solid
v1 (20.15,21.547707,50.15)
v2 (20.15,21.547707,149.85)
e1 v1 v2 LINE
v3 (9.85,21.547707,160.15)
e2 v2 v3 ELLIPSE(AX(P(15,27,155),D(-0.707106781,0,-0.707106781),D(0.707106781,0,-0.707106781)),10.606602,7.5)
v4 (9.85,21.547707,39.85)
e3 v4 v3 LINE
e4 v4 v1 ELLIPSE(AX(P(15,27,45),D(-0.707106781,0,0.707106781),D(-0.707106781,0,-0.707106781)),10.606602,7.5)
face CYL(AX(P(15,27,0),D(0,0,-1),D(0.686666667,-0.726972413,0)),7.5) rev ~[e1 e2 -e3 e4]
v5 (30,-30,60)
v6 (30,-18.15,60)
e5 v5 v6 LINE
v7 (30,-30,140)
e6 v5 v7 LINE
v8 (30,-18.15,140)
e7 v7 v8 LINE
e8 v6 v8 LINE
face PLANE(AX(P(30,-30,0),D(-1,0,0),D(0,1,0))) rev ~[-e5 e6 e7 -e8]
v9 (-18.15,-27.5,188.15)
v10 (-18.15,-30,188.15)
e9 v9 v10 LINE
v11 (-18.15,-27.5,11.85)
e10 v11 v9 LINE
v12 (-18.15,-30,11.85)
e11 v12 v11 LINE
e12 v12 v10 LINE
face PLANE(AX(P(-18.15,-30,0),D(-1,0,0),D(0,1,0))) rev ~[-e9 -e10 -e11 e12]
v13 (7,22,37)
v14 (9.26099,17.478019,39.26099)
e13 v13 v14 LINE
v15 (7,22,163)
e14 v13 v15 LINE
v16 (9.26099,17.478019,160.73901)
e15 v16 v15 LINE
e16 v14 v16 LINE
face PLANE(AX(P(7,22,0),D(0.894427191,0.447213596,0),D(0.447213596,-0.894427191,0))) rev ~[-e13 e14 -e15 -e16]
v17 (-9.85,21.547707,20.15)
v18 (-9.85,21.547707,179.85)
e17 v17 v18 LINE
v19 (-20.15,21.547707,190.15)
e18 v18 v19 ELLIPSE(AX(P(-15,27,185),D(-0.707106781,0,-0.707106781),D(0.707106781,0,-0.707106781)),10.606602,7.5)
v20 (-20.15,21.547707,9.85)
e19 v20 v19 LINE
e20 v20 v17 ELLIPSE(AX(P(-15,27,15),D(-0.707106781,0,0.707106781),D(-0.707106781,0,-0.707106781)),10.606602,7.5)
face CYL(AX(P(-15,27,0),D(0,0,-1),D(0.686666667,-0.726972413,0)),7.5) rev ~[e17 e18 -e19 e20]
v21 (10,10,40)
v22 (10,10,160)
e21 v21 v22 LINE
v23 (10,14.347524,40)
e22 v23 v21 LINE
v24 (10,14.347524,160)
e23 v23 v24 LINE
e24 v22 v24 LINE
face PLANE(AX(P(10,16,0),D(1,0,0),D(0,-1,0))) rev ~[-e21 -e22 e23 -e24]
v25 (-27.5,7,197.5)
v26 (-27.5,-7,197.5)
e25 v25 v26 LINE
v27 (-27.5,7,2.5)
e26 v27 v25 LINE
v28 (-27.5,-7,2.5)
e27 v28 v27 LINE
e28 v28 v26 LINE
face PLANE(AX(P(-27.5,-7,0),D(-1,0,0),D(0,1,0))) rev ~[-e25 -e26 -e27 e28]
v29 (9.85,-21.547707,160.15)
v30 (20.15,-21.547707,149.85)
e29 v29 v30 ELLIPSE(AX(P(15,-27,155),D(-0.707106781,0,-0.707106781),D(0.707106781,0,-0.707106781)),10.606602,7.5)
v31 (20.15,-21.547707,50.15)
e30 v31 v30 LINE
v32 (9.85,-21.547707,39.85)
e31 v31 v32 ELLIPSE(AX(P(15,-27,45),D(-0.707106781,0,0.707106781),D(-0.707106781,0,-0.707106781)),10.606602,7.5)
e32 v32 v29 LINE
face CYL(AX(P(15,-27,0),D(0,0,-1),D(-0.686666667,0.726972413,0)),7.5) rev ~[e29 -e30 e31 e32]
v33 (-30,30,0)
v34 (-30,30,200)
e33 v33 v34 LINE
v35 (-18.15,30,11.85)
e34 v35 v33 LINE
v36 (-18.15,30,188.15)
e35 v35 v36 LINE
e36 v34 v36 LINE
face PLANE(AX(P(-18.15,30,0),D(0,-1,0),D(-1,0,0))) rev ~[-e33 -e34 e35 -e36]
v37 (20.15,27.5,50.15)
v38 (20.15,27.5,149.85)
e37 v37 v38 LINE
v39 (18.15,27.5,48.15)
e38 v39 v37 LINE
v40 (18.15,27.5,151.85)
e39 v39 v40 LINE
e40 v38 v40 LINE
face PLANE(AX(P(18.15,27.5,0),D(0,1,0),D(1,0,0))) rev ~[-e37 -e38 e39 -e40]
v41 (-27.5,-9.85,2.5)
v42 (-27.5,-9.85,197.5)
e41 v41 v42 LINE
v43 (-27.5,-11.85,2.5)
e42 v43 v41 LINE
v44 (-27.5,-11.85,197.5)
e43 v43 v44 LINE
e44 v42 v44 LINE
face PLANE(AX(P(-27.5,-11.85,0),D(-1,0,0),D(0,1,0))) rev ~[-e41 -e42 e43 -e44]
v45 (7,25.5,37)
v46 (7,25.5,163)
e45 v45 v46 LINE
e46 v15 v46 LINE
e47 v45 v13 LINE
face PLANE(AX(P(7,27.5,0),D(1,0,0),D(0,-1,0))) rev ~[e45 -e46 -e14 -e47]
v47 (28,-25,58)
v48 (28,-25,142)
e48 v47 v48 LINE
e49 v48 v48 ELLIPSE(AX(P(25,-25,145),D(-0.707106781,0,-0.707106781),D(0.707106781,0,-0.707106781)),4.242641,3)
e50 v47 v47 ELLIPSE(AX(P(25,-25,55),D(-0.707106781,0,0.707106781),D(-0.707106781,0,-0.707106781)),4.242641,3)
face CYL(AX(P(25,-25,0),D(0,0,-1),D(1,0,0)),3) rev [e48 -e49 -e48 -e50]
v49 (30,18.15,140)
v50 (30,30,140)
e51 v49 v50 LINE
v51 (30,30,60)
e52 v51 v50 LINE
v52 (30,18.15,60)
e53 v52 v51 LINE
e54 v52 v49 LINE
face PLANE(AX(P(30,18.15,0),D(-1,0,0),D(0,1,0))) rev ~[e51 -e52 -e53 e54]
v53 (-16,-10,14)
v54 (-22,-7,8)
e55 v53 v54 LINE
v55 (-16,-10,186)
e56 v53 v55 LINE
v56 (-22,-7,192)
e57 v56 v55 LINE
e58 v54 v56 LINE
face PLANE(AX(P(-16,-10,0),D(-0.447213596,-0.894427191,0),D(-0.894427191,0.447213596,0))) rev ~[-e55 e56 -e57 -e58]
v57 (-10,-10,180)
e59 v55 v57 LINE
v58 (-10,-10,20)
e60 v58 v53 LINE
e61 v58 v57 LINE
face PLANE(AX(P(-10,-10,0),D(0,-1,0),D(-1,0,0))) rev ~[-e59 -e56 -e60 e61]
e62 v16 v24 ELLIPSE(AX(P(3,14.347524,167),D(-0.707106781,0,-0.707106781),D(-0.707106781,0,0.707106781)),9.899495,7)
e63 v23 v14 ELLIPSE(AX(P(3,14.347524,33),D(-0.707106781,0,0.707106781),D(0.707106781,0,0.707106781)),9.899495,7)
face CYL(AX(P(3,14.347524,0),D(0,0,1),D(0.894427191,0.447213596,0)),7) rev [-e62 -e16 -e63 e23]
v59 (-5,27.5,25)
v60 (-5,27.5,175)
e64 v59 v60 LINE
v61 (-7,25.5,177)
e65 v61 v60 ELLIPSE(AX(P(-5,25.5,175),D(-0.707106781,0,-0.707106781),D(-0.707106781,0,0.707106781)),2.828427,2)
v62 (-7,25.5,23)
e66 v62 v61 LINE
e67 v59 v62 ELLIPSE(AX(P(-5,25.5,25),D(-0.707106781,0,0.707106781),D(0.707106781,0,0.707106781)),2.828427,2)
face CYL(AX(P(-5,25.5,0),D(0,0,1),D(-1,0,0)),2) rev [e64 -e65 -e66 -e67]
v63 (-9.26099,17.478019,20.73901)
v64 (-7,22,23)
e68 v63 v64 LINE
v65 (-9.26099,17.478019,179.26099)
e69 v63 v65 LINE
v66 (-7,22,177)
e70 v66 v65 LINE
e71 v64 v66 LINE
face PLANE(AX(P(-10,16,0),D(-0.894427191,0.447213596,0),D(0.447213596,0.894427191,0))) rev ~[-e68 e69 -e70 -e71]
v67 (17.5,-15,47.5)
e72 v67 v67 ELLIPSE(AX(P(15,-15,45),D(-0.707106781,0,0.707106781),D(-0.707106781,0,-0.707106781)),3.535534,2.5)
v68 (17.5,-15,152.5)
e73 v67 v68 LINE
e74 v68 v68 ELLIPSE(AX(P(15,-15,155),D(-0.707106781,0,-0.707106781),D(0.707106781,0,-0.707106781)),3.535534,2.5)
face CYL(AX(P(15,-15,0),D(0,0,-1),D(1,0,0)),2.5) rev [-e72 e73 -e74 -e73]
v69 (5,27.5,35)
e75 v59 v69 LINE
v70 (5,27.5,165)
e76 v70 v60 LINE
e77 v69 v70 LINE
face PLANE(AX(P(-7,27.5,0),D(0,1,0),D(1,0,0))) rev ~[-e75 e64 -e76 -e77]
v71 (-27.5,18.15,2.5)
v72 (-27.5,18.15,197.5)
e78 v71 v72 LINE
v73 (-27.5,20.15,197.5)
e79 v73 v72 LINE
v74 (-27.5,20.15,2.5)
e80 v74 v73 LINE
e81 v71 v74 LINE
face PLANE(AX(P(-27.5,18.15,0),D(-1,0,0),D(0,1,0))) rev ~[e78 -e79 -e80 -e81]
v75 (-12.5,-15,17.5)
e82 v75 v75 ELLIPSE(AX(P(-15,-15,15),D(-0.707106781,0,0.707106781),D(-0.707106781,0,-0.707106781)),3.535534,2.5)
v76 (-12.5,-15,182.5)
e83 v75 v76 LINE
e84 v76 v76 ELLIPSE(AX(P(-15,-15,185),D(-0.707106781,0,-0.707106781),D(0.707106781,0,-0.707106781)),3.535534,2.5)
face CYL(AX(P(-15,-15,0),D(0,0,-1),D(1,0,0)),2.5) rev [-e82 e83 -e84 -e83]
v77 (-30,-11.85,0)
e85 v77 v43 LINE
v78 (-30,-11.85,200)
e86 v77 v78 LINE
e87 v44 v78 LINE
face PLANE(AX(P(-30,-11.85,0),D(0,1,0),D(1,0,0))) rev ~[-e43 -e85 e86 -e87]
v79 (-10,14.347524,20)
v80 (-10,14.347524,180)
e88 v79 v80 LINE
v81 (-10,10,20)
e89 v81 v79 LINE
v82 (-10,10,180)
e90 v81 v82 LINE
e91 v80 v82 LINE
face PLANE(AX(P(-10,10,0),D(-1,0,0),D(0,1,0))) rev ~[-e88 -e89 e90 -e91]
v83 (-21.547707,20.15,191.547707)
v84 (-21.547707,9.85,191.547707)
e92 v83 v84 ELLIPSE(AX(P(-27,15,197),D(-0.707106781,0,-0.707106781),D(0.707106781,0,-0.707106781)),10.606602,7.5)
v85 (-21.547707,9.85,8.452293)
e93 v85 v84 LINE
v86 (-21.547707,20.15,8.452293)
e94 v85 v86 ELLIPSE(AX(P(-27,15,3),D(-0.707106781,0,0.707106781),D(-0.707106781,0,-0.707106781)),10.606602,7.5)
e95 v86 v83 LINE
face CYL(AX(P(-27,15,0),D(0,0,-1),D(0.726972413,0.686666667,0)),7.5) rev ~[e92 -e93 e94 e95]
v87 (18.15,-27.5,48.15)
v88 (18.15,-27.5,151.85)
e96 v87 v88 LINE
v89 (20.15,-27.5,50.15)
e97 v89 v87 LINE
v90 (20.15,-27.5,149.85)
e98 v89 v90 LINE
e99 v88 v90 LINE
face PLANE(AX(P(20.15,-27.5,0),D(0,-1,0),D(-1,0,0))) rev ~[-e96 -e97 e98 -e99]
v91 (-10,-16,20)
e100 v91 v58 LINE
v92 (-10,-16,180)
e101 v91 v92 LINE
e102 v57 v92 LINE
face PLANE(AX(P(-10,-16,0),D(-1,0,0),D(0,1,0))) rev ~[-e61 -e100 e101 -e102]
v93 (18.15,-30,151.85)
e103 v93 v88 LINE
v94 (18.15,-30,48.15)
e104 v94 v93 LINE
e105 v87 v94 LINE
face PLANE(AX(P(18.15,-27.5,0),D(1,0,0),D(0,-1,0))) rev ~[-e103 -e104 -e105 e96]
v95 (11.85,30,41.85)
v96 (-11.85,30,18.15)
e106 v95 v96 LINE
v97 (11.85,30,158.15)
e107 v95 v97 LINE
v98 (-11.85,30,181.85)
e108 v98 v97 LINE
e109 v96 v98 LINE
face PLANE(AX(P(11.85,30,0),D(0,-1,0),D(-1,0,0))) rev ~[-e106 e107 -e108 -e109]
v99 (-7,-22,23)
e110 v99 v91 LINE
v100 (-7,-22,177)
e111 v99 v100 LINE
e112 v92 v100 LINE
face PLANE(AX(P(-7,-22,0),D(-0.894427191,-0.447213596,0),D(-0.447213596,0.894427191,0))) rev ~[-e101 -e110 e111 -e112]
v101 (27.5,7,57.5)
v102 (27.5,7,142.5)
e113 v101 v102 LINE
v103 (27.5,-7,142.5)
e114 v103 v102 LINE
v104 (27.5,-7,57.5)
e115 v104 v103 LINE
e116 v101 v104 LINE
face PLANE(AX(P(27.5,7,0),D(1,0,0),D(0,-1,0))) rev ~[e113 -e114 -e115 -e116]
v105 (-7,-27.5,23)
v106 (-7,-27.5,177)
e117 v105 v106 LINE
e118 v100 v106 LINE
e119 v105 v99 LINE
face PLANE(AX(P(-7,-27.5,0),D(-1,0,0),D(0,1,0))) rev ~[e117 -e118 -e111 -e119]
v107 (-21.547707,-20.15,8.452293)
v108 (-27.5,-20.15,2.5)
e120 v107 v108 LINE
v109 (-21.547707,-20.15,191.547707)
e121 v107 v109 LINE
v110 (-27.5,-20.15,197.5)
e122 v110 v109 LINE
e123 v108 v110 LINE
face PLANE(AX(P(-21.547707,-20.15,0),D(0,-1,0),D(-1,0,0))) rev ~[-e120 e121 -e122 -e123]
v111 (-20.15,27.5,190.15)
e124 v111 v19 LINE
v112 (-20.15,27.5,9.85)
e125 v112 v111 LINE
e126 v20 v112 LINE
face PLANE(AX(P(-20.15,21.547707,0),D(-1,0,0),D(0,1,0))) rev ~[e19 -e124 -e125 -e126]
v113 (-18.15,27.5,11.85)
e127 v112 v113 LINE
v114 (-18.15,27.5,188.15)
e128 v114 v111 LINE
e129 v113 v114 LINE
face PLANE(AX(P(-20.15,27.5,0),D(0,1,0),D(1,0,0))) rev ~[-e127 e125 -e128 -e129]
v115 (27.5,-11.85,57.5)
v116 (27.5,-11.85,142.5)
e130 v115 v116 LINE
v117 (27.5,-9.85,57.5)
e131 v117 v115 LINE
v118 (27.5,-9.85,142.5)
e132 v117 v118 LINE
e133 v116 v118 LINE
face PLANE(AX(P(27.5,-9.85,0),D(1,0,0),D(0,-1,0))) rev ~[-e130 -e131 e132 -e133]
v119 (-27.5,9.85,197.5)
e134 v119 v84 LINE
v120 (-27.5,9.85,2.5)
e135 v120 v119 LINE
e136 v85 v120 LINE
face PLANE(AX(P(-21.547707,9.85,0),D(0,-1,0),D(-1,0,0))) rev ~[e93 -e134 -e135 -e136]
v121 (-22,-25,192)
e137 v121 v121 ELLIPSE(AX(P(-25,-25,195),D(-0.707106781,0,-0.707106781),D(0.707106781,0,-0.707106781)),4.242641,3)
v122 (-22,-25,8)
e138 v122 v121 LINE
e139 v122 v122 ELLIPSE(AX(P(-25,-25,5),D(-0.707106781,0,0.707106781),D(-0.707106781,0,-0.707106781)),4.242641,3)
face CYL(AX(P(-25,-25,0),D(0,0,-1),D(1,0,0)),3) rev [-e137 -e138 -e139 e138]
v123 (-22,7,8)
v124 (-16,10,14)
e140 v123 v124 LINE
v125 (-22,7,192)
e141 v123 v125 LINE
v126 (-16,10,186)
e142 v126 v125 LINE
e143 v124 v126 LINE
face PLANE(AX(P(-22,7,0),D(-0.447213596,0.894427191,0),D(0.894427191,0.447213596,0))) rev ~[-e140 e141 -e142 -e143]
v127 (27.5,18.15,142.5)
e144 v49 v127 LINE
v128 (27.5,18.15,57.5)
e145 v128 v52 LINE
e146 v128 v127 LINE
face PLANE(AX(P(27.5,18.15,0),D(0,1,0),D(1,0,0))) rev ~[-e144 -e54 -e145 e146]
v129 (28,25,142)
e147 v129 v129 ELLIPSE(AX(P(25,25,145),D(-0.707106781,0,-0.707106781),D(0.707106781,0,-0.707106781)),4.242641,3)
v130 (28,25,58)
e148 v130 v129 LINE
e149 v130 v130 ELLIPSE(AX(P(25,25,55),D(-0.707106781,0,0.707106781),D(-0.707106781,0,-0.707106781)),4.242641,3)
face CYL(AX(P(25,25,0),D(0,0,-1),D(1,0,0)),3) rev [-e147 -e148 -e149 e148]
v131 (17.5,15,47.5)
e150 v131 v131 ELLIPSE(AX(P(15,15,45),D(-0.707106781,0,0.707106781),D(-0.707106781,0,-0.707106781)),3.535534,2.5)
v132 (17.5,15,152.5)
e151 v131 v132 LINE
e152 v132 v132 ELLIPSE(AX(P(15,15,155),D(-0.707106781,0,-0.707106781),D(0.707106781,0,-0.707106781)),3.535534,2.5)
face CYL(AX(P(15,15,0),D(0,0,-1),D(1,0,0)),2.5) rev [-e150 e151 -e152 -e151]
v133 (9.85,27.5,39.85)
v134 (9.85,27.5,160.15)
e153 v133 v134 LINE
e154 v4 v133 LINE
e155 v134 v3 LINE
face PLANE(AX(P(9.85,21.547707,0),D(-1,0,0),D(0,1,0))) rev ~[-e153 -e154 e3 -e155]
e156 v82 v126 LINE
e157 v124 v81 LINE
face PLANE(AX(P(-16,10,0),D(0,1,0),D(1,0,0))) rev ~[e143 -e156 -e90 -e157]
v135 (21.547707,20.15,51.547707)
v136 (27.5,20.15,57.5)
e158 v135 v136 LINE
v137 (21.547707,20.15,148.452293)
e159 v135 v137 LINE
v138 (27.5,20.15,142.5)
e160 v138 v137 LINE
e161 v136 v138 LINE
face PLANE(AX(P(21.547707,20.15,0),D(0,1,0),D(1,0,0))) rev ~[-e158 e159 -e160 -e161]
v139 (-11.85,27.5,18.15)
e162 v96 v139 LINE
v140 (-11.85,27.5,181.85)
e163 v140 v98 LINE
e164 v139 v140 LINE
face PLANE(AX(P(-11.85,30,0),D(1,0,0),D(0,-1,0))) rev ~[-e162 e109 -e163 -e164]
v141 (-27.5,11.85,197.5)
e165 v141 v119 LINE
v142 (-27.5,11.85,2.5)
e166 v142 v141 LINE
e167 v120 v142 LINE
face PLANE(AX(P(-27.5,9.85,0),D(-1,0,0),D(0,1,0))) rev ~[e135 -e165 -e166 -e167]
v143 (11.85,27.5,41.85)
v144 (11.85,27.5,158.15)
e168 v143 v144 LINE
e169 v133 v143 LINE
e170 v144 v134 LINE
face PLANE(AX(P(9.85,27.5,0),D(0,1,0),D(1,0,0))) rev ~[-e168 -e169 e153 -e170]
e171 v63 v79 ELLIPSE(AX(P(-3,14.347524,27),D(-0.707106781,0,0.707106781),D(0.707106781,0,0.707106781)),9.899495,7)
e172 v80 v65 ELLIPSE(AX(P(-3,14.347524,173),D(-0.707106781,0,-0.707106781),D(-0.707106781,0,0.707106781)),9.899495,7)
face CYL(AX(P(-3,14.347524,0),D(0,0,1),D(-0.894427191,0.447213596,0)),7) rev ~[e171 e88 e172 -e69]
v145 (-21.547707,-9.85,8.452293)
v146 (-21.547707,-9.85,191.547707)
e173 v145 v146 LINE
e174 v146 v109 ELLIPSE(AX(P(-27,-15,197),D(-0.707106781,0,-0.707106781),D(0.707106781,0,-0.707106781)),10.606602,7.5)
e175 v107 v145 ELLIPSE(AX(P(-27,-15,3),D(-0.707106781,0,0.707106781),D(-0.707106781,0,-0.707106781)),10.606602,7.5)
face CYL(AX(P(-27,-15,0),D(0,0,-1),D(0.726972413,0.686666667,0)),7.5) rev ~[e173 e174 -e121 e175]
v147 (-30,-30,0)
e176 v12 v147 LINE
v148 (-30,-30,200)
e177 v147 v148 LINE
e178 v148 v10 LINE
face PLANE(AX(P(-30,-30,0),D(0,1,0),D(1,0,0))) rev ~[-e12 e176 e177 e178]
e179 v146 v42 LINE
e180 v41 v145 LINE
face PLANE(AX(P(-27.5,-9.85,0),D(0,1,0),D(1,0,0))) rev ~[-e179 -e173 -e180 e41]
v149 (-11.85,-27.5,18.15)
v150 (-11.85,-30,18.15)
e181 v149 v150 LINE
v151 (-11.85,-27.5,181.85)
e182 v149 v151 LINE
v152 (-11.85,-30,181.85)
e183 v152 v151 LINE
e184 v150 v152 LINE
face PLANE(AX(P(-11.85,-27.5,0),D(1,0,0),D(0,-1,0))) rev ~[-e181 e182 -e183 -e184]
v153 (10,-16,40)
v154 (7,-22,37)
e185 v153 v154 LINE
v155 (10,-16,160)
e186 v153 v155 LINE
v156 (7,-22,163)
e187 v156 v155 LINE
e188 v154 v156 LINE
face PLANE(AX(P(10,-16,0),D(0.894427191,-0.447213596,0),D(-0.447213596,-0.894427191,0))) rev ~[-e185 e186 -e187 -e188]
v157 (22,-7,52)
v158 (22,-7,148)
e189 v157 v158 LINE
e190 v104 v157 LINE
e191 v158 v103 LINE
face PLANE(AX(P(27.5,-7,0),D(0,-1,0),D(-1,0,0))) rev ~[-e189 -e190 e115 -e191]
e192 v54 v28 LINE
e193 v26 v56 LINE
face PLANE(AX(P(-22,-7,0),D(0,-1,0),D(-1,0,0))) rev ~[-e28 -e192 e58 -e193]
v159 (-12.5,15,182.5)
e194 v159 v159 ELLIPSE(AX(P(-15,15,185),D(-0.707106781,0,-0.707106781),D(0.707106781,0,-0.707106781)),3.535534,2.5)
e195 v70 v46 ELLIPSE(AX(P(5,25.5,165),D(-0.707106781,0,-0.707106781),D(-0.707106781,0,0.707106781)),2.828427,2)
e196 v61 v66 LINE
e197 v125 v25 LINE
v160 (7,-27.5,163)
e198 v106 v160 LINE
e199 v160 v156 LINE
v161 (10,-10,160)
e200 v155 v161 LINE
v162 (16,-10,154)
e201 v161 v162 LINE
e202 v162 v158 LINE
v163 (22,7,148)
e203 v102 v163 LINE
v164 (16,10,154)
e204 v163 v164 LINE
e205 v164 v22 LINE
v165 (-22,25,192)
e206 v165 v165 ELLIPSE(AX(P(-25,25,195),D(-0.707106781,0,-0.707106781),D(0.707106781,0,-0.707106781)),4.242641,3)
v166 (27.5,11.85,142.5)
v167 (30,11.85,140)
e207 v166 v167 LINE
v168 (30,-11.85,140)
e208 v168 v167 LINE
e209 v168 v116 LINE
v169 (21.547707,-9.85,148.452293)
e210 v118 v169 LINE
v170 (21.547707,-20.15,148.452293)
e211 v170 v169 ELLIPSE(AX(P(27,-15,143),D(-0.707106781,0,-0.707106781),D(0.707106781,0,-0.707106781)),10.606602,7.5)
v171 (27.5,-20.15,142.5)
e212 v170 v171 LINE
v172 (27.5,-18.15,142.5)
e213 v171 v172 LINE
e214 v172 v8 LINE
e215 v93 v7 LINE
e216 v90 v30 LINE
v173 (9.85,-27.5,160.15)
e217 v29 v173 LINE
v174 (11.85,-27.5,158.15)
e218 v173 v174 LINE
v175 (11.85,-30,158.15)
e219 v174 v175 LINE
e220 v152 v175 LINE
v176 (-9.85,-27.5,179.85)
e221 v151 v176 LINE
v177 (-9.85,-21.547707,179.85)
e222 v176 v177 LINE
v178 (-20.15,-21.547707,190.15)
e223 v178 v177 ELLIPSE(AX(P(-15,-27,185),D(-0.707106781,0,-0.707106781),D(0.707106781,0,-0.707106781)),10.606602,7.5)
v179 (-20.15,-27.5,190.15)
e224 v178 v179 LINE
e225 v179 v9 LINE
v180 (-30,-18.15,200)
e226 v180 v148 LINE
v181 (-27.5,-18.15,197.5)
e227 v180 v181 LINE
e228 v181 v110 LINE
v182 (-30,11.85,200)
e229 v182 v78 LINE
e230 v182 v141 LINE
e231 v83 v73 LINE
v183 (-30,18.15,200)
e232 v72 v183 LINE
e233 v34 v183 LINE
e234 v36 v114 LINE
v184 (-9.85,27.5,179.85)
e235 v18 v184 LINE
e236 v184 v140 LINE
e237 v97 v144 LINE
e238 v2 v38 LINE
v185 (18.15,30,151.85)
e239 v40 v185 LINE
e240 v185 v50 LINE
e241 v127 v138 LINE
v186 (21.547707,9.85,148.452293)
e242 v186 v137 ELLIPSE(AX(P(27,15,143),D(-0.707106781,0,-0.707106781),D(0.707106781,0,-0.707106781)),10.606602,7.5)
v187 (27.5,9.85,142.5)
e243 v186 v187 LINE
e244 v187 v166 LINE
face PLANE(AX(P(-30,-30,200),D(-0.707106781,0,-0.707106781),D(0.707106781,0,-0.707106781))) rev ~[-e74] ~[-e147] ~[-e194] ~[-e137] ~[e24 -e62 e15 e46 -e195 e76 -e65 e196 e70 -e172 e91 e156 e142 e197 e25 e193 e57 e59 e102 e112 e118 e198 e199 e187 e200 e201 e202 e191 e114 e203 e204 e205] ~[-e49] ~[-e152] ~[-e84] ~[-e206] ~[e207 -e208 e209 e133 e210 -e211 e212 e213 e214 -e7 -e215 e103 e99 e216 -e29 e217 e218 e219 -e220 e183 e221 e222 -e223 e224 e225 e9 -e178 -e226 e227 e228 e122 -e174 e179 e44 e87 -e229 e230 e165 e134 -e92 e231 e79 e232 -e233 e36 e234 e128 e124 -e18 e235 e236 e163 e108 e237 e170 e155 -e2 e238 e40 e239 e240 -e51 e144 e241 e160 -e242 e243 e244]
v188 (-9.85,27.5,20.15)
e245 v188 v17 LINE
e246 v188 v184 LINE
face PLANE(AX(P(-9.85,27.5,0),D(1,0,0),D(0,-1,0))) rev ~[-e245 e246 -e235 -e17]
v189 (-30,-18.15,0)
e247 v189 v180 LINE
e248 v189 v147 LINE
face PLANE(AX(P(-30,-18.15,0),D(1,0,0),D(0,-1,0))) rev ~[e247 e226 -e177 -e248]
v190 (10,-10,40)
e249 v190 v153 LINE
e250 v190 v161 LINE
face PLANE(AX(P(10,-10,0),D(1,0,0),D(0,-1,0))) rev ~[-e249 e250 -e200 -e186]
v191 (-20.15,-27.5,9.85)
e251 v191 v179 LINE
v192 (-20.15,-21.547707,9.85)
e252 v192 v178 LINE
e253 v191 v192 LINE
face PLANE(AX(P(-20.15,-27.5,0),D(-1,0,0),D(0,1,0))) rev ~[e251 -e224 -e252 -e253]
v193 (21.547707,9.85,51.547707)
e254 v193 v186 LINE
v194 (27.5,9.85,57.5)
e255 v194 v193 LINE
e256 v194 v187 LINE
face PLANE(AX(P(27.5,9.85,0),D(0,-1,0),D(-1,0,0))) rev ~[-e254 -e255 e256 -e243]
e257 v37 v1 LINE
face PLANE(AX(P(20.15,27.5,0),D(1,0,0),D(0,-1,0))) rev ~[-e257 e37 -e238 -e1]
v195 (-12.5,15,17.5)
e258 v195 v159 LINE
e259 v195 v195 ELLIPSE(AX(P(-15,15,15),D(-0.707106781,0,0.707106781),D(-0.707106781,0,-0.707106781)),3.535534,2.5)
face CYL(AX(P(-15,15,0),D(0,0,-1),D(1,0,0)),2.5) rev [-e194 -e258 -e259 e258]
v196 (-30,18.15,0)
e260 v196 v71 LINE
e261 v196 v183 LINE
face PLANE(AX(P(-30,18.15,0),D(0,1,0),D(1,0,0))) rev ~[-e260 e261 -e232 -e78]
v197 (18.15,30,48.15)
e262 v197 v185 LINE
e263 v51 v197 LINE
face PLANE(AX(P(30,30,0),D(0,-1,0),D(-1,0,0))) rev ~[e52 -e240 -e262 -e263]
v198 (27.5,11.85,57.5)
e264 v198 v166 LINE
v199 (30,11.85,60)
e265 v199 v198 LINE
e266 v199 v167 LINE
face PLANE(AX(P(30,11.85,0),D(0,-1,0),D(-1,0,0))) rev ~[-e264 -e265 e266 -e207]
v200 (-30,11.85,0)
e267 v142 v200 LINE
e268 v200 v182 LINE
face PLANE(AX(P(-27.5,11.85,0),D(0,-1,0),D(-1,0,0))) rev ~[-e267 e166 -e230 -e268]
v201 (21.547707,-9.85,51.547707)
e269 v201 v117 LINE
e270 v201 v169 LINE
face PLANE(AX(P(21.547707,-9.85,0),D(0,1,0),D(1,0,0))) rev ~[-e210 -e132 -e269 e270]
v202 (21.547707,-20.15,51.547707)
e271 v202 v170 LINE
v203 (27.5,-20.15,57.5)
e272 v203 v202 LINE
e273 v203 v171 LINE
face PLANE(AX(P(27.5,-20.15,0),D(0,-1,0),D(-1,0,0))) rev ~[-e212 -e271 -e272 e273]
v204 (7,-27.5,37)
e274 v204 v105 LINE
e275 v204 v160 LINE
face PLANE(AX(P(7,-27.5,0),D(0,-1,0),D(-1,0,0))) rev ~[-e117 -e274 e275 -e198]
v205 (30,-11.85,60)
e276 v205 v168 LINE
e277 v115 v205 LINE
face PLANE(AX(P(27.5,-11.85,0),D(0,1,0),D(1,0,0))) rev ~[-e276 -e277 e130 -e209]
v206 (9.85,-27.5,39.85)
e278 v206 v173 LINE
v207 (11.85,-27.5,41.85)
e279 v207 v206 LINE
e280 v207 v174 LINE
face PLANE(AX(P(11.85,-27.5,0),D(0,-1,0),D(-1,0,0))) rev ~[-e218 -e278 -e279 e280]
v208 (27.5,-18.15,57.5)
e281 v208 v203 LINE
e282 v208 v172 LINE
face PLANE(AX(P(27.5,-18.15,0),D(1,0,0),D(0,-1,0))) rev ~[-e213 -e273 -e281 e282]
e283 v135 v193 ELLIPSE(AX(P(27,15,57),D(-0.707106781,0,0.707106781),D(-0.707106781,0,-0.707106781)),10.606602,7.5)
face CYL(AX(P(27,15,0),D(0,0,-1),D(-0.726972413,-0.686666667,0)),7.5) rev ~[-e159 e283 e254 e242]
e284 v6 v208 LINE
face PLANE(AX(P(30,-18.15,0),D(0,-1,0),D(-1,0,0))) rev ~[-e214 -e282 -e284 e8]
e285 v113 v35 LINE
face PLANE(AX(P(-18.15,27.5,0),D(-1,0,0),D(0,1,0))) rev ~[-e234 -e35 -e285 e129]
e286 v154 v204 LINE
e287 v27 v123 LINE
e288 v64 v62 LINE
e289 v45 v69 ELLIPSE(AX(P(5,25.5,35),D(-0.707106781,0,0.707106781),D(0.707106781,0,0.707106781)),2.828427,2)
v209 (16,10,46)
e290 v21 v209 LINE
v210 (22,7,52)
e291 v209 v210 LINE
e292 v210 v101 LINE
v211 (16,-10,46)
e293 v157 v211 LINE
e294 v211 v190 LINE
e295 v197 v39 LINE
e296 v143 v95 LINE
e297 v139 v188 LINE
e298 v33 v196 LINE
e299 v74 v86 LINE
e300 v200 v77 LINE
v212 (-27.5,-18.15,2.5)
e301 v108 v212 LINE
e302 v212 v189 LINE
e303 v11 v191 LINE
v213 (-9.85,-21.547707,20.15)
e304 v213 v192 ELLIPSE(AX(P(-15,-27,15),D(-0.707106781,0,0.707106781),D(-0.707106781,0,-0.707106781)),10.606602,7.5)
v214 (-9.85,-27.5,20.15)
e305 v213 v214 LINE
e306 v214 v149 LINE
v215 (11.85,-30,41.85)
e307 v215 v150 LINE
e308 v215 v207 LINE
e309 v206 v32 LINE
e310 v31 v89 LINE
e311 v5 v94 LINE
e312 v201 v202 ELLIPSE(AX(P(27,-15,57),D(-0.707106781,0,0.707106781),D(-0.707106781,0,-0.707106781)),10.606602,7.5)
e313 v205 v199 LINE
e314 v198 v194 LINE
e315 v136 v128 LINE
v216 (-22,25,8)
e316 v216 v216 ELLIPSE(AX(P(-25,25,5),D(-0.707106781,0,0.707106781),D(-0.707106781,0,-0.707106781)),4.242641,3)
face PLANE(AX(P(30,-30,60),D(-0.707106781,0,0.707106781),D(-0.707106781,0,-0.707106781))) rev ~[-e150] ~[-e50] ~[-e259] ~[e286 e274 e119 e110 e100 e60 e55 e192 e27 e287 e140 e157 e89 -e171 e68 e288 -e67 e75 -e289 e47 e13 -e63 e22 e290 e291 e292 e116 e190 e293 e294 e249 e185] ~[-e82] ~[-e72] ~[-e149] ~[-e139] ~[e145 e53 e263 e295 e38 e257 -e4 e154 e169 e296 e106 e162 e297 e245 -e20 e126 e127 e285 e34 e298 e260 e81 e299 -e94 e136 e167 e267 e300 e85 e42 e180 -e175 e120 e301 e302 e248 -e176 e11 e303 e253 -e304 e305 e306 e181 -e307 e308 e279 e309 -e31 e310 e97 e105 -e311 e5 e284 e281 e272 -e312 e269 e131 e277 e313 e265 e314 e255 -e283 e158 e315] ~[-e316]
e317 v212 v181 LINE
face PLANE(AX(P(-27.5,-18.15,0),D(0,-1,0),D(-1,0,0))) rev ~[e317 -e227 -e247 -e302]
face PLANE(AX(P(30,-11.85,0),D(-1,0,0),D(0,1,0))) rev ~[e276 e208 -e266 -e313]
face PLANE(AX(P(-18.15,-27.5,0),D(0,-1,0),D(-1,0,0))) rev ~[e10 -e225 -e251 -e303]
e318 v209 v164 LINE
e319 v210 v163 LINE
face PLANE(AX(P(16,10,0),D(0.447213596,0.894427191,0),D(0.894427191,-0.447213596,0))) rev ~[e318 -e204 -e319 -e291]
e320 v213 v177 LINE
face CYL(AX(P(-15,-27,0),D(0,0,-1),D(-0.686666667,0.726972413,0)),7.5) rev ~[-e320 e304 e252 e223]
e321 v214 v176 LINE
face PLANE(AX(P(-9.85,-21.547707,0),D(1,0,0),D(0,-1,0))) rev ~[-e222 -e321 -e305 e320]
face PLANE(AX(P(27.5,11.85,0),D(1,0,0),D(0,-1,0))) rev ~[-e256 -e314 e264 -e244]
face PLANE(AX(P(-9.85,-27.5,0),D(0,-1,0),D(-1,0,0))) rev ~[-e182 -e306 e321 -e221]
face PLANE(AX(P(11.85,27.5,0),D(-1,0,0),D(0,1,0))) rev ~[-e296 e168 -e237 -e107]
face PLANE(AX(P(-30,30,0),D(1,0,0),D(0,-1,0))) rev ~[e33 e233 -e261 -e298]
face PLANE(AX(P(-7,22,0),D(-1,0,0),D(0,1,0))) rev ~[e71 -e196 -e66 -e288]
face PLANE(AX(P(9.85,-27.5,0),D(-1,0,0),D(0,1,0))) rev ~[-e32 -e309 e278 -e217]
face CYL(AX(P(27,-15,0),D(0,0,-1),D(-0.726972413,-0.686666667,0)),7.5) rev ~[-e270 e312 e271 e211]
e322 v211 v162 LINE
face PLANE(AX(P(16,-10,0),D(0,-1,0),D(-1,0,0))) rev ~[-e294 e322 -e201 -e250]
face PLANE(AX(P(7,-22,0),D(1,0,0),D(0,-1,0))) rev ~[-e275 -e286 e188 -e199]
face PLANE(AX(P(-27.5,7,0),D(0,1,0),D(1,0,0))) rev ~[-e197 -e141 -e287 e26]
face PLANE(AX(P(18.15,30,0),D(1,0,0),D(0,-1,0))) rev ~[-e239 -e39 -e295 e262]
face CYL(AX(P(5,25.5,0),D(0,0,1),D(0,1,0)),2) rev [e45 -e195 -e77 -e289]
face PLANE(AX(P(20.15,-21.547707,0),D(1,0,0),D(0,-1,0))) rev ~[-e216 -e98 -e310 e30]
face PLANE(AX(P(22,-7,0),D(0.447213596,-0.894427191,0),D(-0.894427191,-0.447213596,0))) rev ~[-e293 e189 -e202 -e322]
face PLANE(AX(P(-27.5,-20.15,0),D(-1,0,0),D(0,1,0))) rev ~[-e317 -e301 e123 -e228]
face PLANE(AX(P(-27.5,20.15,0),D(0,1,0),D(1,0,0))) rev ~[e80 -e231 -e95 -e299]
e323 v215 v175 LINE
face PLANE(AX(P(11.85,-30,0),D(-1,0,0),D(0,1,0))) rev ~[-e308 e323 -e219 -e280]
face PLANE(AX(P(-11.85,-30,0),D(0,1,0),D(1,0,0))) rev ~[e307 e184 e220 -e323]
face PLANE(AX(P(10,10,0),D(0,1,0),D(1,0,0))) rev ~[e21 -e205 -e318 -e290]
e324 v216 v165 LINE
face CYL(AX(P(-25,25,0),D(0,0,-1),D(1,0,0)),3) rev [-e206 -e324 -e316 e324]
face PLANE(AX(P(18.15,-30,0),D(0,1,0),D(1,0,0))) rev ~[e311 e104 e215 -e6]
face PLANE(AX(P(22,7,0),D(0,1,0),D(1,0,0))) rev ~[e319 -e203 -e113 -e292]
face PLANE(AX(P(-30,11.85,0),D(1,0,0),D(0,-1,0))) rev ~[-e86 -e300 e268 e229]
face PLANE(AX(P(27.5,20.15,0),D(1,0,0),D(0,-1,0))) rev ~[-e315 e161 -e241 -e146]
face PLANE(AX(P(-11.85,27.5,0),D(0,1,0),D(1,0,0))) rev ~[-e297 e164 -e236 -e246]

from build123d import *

# Parameters (mm, degrees)
F0_R     = 3
F0_R_2   = 2.5
F1_DEPTH = 200
F2_R     = 2
F3_R     = 7
F5_DEPTH = 60


# Not quite as in the source:
# - a feature names something its author has since deleted; it is built from what else it names


with BuildPart() as f1:
    # F0 (on Top) → F1 (new body)
    with BuildSketch(Plane.XY):
        with BuildLine():
            Line((18.15, -30), (30, -30))
            Line((30, -30), (30, -18.15))
            Line((30, -18.15), (27.5, -18.15))
            Line((27.5, -18.15), (27.5, -20.15))
            Line((27.5, -20.15), (21.5477069044, -20.15))
            ThreePointArc((21.5477069044, -20.15), (19.5, -15), (21.5477069044, -9.85))
            Line((21.5477069044, -9.85), (27.5, -9.85))
            Line((27.5, -9.85), (27.5, -11.85))
            Line((27.5, -11.85), (30, -11.85))
            Line((30, -11.85), (30, 11.85))
            Line((30, 11.85), (27.5, 11.85))
            Line((27.5, 11.85), (27.5, 9.85))
            Line((27.5, 9.85), (21.5477069044, 9.85))
            ThreePointArc((21.5477069044, 9.85), (19.5, 15), (21.5477069044, 20.15))
            Line((21.5477069044, 20.15), (27.5, 20.15))
            Line((27.5, 20.15), (27.5, 18.15))
            Line((27.5, 18.15), (30, 18.15))
            Line((30, 18.15), (30, 30))
            Line((30, 30), (18.15, 30))
            Line((18.15, 30), (18.15, 27.5))
            Line((18.15, 27.5), (20.15, 27.5))
            Line((20.15, 27.5), (20.15, 21.5477069044))
            ThreePointArc((20.15, 21.5477069044), (15, 19.5), (9.85, 21.5477069044))
            Line((9.85, 21.5477069044), (9.85, 27.5))
            Line((9.85, 27.5), (11.85, 27.5))
            Line((11.85, 27.5), (11.85, 30))
            Line((11.85, 30), (-11.85, 30))
            Line((-11.85, 30), (-11.85, 27.5))
            Line((-11.85, 27.5), (-9.85, 27.5))
            Line((-9.85, 27.5), (-9.85, 21.5477069044))
            ThreePointArc((-9.85, 21.5477069044), (-15, 19.5), (-20.15, 21.5477069044))
            Line((-20.15, 21.5477069044), (-20.15, 27.5))
            Line((-20.15, 27.5), (-18.15, 27.5))
            Line((-18.15, 27.5), (-18.15, 30))
            Line((-18.15, 30), (-30, 30))
            Line((-30, 30), (-30, 18.15))
            Line((-30, 18.15), (-27.5, 18.15))
            Line((-27.5, 18.15), (-27.5, 20.15))
            Line((-27.5, 20.15), (-21.5477069044, 20.15))
            ThreePointArc((-21.5477069044, 20.15), (-19.5, 15), (-21.5477069044, 9.85))
            Line((-21.5477069044, 9.85), (-27.5, 9.85))
            Line((-27.5, 9.85), (-27.5, 11.85))
            Line((-27.5, 11.85), (-30, 11.85))
            Line((-30, 11.85), (-30, -11.85))
            Line((-30, -11.85), (-27.5, -11.85))
            Line((-27.5, -11.85), (-27.5, -9.85))
            Line((-27.5, -9.85), (-21.5477069044, -9.85))
            ThreePointArc((-21.5477069044, -9.85), (-19.5, -15), (-21.5477069044, -20.15))
            Line((-21.5477069044, -20.15), (-27.5, -20.15))
            Line((-27.5, -20.15), (-27.5, -18.15))
            Line((-27.5, -18.15), (-30, -18.15))
            Line((-30, -18.15), (-30, -30))
            Line((-30, -30), (-18.15, -30))
            Line((-18.15, -30), (-18.15, -27.5))
            Line((-18.15, -27.5), (-20.15, -27.5))
            Line((-20.15, -27.5), (-20.15, -21.5477069044))
            ThreePointArc((-20.15, -21.5477069044), (-15, -19.5), (-9.85, -21.5477069044))
            Line((-9.85, -21.5477069044), (-9.85, -27.5))
            Line((-9.85, -27.5), (-11.85, -27.5))
            Line((-11.85, -27.5), (-11.85, -30))
            Line((-11.85, -30), (11.85, -30))
            Line((11.85, -30), (11.85, -27.5))
            Line((11.85, -27.5), (9.85, -27.5))
            Line((9.85, -27.5), (9.85, -21.5477069044))
            ThreePointArc((9.85, -21.5477069044), (15, -19.5), (20.15, -21.5477069044))
            Line((20.15, -21.5477069044), (20.15, -27.5))
            Line((20.15, -27.5), (18.15, -27.5))
            Line((18.15, -27.5), (18.15, -30))
        make_face()
        with Locations((-25, -25)):
            Circle(F0_R, mode=Mode.SUBTRACT)
        with Locations((-15, -15)):
            Circle(F0_R_2, mode=Mode.SUBTRACT)
        with Locations((25, -25)):
            Circle(F0_R, mode=Mode.SUBTRACT)
        with Locations((15, -15)):
            Circle(F0_R_2, mode=Mode.SUBTRACT)
        with Locations((-25, 25)):
            Circle(F0_R, mode=Mode.SUBTRACT)
        with Locations((-15, 15)):
            Circle(F0_R_2, mode=Mode.SUBTRACT)
        Polygon((-7, 22), (-7, 27.5), (0, 27.5), (7, 27.5), (7, 22), (10, 16), (10, 10), (16, 10), (22, 7), (27.5, 7), (27.5, 0), (27.5, -7), (22, -7), (16, -10), (10, -10), (10, -16), (7, -22), (7, -27.5), (0, -27.5), (-7, -27.5), (-7, -22), (-10, -16), (-10, -10), (-16, -10), (-22, -7), (-27.5, -7), (-27.5, 0), (-27.5, 7), (-22, 7), (-16, 10), (-10, 10), (-10, 16), align=None, mode=Mode.SUBTRACT)
        with Locations((15, 15)):
            Circle(F0_R_2, mode=Mode.SUBTRACT)
        with Locations((25, 25)):
            Circle(F0_R, mode=Mode.SUBTRACT)
    extrude(amount=F1_DEPTH)

    # F2
    f2_edges = [f1.edges().sort_by_distance(p)[0] for p in [
        (-7, 27.5, 100),
        (7, 27.5, 100),
    ]]
    fillet(f2_edges, radius=F2_R)

    # F3
    f3_edges = [f1.edges().sort_by_distance(p)[0] for p in [
        (-10, 16, 100),
        (10, 16, 100),
    ]]
    fillet(f3_edges, radius=F3_R)

    # F4 (on face) → F5 (cut)
    with BuildSketch(Plane.XZ.offset(30)):
        Polygon((30, 0), (30, 60), (-30, 0), (-18.15, 0), align=None)
        Polygon((30, 140), (30, 200), (-18.15, 200), (-30, 200), align=None)
    extrude(amount=-F5_DEPTH, mode=Mode.SUBTRACT)


solid = f1.part
